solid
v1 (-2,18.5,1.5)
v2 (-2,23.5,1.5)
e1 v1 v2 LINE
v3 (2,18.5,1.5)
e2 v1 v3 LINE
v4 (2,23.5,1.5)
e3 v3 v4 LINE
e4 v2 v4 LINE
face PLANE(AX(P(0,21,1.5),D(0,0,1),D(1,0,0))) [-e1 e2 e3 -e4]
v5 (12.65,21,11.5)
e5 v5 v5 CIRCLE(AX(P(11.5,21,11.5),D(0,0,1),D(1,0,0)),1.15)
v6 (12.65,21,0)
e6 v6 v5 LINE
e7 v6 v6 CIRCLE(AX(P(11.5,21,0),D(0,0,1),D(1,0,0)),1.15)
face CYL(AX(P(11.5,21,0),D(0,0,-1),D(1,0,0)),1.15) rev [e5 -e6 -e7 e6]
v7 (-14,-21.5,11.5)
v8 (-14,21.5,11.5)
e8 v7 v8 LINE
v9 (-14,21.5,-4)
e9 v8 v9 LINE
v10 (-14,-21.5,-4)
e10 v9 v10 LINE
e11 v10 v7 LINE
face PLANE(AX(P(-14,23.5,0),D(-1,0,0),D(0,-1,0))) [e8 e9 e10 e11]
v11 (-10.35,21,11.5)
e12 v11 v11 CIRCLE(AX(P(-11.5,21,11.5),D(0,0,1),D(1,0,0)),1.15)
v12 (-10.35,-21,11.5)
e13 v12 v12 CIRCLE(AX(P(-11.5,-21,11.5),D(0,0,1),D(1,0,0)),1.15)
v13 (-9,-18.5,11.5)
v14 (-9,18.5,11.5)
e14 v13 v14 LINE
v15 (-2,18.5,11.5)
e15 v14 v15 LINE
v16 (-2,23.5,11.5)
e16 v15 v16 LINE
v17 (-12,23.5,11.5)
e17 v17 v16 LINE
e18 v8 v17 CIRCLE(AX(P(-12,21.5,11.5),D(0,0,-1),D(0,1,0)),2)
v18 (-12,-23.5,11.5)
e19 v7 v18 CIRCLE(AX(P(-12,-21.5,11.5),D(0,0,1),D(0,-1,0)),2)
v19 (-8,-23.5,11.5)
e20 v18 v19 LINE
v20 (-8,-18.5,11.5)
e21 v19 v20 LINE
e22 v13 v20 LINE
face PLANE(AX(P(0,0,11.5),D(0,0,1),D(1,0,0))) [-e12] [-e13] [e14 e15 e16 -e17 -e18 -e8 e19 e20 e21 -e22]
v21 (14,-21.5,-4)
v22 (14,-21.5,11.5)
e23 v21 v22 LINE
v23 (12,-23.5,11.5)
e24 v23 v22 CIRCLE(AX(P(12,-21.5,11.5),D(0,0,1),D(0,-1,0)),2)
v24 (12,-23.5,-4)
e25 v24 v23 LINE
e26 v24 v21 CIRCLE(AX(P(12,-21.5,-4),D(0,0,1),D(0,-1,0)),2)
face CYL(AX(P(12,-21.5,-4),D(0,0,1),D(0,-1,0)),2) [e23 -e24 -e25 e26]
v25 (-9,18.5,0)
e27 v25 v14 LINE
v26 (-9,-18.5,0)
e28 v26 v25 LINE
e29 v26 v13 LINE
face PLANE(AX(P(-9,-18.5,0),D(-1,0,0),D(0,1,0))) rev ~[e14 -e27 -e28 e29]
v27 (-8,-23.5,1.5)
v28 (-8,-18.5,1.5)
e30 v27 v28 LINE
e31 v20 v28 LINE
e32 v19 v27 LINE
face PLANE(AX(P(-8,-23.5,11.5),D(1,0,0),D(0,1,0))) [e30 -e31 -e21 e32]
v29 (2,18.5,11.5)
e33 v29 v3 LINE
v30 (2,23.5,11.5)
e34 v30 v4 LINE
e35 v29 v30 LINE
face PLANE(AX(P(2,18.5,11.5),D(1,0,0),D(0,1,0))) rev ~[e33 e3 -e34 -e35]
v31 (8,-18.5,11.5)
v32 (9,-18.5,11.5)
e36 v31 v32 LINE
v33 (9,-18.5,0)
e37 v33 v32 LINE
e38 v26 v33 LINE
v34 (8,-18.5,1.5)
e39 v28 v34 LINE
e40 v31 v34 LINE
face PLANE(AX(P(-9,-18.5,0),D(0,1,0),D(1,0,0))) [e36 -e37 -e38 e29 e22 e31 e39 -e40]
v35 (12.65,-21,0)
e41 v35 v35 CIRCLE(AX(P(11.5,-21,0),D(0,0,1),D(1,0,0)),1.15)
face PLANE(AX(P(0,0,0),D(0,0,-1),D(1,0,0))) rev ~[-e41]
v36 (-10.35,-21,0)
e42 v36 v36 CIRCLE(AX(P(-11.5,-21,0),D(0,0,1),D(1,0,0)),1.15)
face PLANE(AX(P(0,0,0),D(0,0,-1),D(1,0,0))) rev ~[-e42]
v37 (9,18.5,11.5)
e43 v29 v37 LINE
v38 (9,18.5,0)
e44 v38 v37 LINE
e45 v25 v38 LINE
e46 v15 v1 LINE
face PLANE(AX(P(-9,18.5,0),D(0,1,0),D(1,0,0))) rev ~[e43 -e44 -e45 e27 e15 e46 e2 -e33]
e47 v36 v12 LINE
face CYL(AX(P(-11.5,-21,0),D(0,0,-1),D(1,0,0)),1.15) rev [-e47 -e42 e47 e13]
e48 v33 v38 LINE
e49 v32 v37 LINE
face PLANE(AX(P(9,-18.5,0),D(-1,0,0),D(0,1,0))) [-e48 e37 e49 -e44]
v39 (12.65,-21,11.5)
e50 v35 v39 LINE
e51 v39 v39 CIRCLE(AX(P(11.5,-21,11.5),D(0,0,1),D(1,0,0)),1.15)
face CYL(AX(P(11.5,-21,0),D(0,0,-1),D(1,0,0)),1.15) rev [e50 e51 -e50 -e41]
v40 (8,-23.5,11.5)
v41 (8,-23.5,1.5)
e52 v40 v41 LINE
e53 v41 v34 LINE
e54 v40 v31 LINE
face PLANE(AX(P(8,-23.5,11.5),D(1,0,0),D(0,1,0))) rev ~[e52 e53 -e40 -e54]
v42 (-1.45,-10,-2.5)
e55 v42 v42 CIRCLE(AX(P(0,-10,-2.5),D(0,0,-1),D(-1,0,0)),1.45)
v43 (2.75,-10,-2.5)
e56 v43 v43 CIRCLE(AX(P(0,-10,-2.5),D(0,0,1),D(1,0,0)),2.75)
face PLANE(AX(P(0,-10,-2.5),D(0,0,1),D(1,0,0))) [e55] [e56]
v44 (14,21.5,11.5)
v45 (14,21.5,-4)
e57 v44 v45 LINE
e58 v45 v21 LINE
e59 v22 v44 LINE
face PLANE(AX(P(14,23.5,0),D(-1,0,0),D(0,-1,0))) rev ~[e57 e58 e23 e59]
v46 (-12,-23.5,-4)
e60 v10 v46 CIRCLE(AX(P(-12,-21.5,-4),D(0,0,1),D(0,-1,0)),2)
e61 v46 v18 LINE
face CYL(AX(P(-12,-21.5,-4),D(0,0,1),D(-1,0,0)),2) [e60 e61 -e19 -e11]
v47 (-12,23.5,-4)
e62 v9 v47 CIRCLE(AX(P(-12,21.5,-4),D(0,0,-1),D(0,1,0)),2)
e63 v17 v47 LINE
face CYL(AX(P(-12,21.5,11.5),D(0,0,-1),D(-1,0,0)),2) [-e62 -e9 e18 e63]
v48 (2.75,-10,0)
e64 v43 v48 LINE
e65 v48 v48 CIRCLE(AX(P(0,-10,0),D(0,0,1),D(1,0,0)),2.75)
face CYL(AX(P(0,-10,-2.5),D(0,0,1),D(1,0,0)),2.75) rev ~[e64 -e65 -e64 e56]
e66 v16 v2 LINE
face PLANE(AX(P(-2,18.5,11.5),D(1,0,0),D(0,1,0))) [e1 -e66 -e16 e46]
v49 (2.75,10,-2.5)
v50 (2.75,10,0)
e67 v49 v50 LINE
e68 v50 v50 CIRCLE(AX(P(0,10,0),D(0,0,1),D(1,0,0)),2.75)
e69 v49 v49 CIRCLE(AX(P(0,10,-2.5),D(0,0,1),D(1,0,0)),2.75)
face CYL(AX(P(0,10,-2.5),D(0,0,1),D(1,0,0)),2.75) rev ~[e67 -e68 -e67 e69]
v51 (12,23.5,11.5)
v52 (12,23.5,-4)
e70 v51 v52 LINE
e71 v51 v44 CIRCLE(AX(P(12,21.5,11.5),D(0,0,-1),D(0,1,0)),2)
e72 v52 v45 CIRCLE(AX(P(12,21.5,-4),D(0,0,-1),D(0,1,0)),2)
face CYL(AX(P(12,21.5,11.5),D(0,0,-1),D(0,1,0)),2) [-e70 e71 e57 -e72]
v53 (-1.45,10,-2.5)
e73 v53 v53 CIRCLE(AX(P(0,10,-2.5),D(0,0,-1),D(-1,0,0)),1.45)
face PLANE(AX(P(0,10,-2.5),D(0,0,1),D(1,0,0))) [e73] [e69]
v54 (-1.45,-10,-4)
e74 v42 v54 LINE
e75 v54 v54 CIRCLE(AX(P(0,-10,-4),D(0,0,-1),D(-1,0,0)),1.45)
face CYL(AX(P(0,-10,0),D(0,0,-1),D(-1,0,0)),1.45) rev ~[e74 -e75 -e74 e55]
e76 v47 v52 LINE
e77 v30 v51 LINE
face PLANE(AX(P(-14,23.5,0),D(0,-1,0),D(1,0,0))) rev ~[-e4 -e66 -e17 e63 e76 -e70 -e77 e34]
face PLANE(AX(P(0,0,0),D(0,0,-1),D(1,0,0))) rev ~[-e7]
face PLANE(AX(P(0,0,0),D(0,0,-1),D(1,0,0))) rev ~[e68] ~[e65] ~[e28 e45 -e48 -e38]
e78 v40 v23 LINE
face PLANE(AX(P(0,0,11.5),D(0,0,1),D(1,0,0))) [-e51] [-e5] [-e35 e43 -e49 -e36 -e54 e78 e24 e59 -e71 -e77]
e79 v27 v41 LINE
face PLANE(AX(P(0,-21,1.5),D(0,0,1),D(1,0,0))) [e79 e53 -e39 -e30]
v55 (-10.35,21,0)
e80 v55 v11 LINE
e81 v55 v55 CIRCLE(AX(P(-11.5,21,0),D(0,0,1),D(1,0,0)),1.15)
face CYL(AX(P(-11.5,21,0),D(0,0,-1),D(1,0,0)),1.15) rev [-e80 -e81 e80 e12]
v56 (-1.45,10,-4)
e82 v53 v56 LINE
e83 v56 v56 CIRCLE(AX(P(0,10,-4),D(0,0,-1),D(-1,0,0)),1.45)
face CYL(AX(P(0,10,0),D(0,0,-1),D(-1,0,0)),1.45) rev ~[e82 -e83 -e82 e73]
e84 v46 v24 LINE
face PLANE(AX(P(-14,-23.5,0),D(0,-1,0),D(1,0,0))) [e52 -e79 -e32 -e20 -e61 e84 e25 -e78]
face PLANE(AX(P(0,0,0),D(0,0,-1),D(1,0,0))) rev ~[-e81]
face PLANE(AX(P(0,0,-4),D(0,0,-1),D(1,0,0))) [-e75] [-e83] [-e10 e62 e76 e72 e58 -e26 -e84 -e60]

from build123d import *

# Parameters (mm, degrees)
F0_W           = 28
F0_H           = 47
F0_R           = 1.15
F0_W_2         = 18
F0_H_2         = 37
F1_DEPTH       = 11.5
F2_W           = 28
F2_H           = 47
F2_R           = 1.15
F2_W_2         = 18
F2_H_2         = 37
F3_DEPTH       = 4
F4_W           = 16
F4_H           = 5
F4_W_2         = 4
F5_DEPTH       = 10
F6_R           = 2
F8_D           = 2.9
F8_CBORE_D     = 5.5
F8_CBORE_DEPTH = 2.5


with BuildPart() as f1:
    # F0 (on Top) → F1 (new body)
    with BuildSketch(Plane.XY):
        Rectangle(F0_W, F0_H)
        with Locations((-11.5, -21)):
            Circle(F0_R, mode=Mode.SUBTRACT)
        with Locations((11.5, -21)):
            Circle(F0_R, mode=Mode.SUBTRACT)
        with Locations((-11.5, 21)):
            Circle(F0_R, mode=Mode.SUBTRACT)
        Rectangle(F0_W_2, F0_H_2, mode=Mode.SUBTRACT)
        with Locations((11.5, 21)):
            Circle(F0_R, mode=Mode.SUBTRACT)
    extrude(amount=F1_DEPTH)

    # F2 (on face) → F3 (join)
    with BuildSketch(Plane(origin=(0, 0, 0), x_dir=(1, 0, 0), z_dir=(0, 0, -1))):
        Rectangle(F2_W, F2_H)
        with Locations((-11.5, -21)):
            Circle(F2_R, mode=Mode.SUBTRACT)
        with Locations((11.5, -21)):
            Circle(F2_R, mode=Mode.SUBTRACT)
        with Locations((-11.5, 21)):
            Circle(F2_R, mode=Mode.SUBTRACT)
        Rectangle(F2_W_2, F2_H_2, mode=Mode.SUBTRACT)
        with Locations((11.5, 21)):
            Circle(F2_R, mode=Mode.SUBTRACT)
        with Locations((-11.5, 21)):
            Circle(F2_R)
        with Locations((11.5, 21)):
            Circle(F2_R)
        with Locations((-11.5, -21)):
            Circle(F2_R)
        Rectangle(F2_W_2, F2_H_2)
        with Locations((11.5, -21)):
            Circle(F2_R)
    extrude(amount=F3_DEPTH)

    # F4 (on face) → F5 (cut)
    with BuildSketch(Plane.XY.offset(11.5)):
        with Locations((0, -21)):
            Rectangle(F4_W, F4_H)
        with Locations((0, 21)):
            Rectangle(F4_W_2, F4_H)
    extrude(amount=-F5_DEPTH, mode=Mode.SUBTRACT)

    # F6
    f6_edges = [f1.edges().sort_by_distance(p)[0] for p in [
        (-14, 23.5, 3.75),
        (14, 23.5, 3.75),
        (14, -23.5, 3.75),
        (-14, -23.5, 3.75),
    ]]
    fillet(f6_edges, radius=F6_R)

    # F8 (through all)
    with Locations(Plane.XY):
        with Locations((0, 10), (0, -10)):
            CounterBoreHole(F8_D / 2, F8_CBORE_D / 2, F8_CBORE_DEPTH)


solid = f1.part
